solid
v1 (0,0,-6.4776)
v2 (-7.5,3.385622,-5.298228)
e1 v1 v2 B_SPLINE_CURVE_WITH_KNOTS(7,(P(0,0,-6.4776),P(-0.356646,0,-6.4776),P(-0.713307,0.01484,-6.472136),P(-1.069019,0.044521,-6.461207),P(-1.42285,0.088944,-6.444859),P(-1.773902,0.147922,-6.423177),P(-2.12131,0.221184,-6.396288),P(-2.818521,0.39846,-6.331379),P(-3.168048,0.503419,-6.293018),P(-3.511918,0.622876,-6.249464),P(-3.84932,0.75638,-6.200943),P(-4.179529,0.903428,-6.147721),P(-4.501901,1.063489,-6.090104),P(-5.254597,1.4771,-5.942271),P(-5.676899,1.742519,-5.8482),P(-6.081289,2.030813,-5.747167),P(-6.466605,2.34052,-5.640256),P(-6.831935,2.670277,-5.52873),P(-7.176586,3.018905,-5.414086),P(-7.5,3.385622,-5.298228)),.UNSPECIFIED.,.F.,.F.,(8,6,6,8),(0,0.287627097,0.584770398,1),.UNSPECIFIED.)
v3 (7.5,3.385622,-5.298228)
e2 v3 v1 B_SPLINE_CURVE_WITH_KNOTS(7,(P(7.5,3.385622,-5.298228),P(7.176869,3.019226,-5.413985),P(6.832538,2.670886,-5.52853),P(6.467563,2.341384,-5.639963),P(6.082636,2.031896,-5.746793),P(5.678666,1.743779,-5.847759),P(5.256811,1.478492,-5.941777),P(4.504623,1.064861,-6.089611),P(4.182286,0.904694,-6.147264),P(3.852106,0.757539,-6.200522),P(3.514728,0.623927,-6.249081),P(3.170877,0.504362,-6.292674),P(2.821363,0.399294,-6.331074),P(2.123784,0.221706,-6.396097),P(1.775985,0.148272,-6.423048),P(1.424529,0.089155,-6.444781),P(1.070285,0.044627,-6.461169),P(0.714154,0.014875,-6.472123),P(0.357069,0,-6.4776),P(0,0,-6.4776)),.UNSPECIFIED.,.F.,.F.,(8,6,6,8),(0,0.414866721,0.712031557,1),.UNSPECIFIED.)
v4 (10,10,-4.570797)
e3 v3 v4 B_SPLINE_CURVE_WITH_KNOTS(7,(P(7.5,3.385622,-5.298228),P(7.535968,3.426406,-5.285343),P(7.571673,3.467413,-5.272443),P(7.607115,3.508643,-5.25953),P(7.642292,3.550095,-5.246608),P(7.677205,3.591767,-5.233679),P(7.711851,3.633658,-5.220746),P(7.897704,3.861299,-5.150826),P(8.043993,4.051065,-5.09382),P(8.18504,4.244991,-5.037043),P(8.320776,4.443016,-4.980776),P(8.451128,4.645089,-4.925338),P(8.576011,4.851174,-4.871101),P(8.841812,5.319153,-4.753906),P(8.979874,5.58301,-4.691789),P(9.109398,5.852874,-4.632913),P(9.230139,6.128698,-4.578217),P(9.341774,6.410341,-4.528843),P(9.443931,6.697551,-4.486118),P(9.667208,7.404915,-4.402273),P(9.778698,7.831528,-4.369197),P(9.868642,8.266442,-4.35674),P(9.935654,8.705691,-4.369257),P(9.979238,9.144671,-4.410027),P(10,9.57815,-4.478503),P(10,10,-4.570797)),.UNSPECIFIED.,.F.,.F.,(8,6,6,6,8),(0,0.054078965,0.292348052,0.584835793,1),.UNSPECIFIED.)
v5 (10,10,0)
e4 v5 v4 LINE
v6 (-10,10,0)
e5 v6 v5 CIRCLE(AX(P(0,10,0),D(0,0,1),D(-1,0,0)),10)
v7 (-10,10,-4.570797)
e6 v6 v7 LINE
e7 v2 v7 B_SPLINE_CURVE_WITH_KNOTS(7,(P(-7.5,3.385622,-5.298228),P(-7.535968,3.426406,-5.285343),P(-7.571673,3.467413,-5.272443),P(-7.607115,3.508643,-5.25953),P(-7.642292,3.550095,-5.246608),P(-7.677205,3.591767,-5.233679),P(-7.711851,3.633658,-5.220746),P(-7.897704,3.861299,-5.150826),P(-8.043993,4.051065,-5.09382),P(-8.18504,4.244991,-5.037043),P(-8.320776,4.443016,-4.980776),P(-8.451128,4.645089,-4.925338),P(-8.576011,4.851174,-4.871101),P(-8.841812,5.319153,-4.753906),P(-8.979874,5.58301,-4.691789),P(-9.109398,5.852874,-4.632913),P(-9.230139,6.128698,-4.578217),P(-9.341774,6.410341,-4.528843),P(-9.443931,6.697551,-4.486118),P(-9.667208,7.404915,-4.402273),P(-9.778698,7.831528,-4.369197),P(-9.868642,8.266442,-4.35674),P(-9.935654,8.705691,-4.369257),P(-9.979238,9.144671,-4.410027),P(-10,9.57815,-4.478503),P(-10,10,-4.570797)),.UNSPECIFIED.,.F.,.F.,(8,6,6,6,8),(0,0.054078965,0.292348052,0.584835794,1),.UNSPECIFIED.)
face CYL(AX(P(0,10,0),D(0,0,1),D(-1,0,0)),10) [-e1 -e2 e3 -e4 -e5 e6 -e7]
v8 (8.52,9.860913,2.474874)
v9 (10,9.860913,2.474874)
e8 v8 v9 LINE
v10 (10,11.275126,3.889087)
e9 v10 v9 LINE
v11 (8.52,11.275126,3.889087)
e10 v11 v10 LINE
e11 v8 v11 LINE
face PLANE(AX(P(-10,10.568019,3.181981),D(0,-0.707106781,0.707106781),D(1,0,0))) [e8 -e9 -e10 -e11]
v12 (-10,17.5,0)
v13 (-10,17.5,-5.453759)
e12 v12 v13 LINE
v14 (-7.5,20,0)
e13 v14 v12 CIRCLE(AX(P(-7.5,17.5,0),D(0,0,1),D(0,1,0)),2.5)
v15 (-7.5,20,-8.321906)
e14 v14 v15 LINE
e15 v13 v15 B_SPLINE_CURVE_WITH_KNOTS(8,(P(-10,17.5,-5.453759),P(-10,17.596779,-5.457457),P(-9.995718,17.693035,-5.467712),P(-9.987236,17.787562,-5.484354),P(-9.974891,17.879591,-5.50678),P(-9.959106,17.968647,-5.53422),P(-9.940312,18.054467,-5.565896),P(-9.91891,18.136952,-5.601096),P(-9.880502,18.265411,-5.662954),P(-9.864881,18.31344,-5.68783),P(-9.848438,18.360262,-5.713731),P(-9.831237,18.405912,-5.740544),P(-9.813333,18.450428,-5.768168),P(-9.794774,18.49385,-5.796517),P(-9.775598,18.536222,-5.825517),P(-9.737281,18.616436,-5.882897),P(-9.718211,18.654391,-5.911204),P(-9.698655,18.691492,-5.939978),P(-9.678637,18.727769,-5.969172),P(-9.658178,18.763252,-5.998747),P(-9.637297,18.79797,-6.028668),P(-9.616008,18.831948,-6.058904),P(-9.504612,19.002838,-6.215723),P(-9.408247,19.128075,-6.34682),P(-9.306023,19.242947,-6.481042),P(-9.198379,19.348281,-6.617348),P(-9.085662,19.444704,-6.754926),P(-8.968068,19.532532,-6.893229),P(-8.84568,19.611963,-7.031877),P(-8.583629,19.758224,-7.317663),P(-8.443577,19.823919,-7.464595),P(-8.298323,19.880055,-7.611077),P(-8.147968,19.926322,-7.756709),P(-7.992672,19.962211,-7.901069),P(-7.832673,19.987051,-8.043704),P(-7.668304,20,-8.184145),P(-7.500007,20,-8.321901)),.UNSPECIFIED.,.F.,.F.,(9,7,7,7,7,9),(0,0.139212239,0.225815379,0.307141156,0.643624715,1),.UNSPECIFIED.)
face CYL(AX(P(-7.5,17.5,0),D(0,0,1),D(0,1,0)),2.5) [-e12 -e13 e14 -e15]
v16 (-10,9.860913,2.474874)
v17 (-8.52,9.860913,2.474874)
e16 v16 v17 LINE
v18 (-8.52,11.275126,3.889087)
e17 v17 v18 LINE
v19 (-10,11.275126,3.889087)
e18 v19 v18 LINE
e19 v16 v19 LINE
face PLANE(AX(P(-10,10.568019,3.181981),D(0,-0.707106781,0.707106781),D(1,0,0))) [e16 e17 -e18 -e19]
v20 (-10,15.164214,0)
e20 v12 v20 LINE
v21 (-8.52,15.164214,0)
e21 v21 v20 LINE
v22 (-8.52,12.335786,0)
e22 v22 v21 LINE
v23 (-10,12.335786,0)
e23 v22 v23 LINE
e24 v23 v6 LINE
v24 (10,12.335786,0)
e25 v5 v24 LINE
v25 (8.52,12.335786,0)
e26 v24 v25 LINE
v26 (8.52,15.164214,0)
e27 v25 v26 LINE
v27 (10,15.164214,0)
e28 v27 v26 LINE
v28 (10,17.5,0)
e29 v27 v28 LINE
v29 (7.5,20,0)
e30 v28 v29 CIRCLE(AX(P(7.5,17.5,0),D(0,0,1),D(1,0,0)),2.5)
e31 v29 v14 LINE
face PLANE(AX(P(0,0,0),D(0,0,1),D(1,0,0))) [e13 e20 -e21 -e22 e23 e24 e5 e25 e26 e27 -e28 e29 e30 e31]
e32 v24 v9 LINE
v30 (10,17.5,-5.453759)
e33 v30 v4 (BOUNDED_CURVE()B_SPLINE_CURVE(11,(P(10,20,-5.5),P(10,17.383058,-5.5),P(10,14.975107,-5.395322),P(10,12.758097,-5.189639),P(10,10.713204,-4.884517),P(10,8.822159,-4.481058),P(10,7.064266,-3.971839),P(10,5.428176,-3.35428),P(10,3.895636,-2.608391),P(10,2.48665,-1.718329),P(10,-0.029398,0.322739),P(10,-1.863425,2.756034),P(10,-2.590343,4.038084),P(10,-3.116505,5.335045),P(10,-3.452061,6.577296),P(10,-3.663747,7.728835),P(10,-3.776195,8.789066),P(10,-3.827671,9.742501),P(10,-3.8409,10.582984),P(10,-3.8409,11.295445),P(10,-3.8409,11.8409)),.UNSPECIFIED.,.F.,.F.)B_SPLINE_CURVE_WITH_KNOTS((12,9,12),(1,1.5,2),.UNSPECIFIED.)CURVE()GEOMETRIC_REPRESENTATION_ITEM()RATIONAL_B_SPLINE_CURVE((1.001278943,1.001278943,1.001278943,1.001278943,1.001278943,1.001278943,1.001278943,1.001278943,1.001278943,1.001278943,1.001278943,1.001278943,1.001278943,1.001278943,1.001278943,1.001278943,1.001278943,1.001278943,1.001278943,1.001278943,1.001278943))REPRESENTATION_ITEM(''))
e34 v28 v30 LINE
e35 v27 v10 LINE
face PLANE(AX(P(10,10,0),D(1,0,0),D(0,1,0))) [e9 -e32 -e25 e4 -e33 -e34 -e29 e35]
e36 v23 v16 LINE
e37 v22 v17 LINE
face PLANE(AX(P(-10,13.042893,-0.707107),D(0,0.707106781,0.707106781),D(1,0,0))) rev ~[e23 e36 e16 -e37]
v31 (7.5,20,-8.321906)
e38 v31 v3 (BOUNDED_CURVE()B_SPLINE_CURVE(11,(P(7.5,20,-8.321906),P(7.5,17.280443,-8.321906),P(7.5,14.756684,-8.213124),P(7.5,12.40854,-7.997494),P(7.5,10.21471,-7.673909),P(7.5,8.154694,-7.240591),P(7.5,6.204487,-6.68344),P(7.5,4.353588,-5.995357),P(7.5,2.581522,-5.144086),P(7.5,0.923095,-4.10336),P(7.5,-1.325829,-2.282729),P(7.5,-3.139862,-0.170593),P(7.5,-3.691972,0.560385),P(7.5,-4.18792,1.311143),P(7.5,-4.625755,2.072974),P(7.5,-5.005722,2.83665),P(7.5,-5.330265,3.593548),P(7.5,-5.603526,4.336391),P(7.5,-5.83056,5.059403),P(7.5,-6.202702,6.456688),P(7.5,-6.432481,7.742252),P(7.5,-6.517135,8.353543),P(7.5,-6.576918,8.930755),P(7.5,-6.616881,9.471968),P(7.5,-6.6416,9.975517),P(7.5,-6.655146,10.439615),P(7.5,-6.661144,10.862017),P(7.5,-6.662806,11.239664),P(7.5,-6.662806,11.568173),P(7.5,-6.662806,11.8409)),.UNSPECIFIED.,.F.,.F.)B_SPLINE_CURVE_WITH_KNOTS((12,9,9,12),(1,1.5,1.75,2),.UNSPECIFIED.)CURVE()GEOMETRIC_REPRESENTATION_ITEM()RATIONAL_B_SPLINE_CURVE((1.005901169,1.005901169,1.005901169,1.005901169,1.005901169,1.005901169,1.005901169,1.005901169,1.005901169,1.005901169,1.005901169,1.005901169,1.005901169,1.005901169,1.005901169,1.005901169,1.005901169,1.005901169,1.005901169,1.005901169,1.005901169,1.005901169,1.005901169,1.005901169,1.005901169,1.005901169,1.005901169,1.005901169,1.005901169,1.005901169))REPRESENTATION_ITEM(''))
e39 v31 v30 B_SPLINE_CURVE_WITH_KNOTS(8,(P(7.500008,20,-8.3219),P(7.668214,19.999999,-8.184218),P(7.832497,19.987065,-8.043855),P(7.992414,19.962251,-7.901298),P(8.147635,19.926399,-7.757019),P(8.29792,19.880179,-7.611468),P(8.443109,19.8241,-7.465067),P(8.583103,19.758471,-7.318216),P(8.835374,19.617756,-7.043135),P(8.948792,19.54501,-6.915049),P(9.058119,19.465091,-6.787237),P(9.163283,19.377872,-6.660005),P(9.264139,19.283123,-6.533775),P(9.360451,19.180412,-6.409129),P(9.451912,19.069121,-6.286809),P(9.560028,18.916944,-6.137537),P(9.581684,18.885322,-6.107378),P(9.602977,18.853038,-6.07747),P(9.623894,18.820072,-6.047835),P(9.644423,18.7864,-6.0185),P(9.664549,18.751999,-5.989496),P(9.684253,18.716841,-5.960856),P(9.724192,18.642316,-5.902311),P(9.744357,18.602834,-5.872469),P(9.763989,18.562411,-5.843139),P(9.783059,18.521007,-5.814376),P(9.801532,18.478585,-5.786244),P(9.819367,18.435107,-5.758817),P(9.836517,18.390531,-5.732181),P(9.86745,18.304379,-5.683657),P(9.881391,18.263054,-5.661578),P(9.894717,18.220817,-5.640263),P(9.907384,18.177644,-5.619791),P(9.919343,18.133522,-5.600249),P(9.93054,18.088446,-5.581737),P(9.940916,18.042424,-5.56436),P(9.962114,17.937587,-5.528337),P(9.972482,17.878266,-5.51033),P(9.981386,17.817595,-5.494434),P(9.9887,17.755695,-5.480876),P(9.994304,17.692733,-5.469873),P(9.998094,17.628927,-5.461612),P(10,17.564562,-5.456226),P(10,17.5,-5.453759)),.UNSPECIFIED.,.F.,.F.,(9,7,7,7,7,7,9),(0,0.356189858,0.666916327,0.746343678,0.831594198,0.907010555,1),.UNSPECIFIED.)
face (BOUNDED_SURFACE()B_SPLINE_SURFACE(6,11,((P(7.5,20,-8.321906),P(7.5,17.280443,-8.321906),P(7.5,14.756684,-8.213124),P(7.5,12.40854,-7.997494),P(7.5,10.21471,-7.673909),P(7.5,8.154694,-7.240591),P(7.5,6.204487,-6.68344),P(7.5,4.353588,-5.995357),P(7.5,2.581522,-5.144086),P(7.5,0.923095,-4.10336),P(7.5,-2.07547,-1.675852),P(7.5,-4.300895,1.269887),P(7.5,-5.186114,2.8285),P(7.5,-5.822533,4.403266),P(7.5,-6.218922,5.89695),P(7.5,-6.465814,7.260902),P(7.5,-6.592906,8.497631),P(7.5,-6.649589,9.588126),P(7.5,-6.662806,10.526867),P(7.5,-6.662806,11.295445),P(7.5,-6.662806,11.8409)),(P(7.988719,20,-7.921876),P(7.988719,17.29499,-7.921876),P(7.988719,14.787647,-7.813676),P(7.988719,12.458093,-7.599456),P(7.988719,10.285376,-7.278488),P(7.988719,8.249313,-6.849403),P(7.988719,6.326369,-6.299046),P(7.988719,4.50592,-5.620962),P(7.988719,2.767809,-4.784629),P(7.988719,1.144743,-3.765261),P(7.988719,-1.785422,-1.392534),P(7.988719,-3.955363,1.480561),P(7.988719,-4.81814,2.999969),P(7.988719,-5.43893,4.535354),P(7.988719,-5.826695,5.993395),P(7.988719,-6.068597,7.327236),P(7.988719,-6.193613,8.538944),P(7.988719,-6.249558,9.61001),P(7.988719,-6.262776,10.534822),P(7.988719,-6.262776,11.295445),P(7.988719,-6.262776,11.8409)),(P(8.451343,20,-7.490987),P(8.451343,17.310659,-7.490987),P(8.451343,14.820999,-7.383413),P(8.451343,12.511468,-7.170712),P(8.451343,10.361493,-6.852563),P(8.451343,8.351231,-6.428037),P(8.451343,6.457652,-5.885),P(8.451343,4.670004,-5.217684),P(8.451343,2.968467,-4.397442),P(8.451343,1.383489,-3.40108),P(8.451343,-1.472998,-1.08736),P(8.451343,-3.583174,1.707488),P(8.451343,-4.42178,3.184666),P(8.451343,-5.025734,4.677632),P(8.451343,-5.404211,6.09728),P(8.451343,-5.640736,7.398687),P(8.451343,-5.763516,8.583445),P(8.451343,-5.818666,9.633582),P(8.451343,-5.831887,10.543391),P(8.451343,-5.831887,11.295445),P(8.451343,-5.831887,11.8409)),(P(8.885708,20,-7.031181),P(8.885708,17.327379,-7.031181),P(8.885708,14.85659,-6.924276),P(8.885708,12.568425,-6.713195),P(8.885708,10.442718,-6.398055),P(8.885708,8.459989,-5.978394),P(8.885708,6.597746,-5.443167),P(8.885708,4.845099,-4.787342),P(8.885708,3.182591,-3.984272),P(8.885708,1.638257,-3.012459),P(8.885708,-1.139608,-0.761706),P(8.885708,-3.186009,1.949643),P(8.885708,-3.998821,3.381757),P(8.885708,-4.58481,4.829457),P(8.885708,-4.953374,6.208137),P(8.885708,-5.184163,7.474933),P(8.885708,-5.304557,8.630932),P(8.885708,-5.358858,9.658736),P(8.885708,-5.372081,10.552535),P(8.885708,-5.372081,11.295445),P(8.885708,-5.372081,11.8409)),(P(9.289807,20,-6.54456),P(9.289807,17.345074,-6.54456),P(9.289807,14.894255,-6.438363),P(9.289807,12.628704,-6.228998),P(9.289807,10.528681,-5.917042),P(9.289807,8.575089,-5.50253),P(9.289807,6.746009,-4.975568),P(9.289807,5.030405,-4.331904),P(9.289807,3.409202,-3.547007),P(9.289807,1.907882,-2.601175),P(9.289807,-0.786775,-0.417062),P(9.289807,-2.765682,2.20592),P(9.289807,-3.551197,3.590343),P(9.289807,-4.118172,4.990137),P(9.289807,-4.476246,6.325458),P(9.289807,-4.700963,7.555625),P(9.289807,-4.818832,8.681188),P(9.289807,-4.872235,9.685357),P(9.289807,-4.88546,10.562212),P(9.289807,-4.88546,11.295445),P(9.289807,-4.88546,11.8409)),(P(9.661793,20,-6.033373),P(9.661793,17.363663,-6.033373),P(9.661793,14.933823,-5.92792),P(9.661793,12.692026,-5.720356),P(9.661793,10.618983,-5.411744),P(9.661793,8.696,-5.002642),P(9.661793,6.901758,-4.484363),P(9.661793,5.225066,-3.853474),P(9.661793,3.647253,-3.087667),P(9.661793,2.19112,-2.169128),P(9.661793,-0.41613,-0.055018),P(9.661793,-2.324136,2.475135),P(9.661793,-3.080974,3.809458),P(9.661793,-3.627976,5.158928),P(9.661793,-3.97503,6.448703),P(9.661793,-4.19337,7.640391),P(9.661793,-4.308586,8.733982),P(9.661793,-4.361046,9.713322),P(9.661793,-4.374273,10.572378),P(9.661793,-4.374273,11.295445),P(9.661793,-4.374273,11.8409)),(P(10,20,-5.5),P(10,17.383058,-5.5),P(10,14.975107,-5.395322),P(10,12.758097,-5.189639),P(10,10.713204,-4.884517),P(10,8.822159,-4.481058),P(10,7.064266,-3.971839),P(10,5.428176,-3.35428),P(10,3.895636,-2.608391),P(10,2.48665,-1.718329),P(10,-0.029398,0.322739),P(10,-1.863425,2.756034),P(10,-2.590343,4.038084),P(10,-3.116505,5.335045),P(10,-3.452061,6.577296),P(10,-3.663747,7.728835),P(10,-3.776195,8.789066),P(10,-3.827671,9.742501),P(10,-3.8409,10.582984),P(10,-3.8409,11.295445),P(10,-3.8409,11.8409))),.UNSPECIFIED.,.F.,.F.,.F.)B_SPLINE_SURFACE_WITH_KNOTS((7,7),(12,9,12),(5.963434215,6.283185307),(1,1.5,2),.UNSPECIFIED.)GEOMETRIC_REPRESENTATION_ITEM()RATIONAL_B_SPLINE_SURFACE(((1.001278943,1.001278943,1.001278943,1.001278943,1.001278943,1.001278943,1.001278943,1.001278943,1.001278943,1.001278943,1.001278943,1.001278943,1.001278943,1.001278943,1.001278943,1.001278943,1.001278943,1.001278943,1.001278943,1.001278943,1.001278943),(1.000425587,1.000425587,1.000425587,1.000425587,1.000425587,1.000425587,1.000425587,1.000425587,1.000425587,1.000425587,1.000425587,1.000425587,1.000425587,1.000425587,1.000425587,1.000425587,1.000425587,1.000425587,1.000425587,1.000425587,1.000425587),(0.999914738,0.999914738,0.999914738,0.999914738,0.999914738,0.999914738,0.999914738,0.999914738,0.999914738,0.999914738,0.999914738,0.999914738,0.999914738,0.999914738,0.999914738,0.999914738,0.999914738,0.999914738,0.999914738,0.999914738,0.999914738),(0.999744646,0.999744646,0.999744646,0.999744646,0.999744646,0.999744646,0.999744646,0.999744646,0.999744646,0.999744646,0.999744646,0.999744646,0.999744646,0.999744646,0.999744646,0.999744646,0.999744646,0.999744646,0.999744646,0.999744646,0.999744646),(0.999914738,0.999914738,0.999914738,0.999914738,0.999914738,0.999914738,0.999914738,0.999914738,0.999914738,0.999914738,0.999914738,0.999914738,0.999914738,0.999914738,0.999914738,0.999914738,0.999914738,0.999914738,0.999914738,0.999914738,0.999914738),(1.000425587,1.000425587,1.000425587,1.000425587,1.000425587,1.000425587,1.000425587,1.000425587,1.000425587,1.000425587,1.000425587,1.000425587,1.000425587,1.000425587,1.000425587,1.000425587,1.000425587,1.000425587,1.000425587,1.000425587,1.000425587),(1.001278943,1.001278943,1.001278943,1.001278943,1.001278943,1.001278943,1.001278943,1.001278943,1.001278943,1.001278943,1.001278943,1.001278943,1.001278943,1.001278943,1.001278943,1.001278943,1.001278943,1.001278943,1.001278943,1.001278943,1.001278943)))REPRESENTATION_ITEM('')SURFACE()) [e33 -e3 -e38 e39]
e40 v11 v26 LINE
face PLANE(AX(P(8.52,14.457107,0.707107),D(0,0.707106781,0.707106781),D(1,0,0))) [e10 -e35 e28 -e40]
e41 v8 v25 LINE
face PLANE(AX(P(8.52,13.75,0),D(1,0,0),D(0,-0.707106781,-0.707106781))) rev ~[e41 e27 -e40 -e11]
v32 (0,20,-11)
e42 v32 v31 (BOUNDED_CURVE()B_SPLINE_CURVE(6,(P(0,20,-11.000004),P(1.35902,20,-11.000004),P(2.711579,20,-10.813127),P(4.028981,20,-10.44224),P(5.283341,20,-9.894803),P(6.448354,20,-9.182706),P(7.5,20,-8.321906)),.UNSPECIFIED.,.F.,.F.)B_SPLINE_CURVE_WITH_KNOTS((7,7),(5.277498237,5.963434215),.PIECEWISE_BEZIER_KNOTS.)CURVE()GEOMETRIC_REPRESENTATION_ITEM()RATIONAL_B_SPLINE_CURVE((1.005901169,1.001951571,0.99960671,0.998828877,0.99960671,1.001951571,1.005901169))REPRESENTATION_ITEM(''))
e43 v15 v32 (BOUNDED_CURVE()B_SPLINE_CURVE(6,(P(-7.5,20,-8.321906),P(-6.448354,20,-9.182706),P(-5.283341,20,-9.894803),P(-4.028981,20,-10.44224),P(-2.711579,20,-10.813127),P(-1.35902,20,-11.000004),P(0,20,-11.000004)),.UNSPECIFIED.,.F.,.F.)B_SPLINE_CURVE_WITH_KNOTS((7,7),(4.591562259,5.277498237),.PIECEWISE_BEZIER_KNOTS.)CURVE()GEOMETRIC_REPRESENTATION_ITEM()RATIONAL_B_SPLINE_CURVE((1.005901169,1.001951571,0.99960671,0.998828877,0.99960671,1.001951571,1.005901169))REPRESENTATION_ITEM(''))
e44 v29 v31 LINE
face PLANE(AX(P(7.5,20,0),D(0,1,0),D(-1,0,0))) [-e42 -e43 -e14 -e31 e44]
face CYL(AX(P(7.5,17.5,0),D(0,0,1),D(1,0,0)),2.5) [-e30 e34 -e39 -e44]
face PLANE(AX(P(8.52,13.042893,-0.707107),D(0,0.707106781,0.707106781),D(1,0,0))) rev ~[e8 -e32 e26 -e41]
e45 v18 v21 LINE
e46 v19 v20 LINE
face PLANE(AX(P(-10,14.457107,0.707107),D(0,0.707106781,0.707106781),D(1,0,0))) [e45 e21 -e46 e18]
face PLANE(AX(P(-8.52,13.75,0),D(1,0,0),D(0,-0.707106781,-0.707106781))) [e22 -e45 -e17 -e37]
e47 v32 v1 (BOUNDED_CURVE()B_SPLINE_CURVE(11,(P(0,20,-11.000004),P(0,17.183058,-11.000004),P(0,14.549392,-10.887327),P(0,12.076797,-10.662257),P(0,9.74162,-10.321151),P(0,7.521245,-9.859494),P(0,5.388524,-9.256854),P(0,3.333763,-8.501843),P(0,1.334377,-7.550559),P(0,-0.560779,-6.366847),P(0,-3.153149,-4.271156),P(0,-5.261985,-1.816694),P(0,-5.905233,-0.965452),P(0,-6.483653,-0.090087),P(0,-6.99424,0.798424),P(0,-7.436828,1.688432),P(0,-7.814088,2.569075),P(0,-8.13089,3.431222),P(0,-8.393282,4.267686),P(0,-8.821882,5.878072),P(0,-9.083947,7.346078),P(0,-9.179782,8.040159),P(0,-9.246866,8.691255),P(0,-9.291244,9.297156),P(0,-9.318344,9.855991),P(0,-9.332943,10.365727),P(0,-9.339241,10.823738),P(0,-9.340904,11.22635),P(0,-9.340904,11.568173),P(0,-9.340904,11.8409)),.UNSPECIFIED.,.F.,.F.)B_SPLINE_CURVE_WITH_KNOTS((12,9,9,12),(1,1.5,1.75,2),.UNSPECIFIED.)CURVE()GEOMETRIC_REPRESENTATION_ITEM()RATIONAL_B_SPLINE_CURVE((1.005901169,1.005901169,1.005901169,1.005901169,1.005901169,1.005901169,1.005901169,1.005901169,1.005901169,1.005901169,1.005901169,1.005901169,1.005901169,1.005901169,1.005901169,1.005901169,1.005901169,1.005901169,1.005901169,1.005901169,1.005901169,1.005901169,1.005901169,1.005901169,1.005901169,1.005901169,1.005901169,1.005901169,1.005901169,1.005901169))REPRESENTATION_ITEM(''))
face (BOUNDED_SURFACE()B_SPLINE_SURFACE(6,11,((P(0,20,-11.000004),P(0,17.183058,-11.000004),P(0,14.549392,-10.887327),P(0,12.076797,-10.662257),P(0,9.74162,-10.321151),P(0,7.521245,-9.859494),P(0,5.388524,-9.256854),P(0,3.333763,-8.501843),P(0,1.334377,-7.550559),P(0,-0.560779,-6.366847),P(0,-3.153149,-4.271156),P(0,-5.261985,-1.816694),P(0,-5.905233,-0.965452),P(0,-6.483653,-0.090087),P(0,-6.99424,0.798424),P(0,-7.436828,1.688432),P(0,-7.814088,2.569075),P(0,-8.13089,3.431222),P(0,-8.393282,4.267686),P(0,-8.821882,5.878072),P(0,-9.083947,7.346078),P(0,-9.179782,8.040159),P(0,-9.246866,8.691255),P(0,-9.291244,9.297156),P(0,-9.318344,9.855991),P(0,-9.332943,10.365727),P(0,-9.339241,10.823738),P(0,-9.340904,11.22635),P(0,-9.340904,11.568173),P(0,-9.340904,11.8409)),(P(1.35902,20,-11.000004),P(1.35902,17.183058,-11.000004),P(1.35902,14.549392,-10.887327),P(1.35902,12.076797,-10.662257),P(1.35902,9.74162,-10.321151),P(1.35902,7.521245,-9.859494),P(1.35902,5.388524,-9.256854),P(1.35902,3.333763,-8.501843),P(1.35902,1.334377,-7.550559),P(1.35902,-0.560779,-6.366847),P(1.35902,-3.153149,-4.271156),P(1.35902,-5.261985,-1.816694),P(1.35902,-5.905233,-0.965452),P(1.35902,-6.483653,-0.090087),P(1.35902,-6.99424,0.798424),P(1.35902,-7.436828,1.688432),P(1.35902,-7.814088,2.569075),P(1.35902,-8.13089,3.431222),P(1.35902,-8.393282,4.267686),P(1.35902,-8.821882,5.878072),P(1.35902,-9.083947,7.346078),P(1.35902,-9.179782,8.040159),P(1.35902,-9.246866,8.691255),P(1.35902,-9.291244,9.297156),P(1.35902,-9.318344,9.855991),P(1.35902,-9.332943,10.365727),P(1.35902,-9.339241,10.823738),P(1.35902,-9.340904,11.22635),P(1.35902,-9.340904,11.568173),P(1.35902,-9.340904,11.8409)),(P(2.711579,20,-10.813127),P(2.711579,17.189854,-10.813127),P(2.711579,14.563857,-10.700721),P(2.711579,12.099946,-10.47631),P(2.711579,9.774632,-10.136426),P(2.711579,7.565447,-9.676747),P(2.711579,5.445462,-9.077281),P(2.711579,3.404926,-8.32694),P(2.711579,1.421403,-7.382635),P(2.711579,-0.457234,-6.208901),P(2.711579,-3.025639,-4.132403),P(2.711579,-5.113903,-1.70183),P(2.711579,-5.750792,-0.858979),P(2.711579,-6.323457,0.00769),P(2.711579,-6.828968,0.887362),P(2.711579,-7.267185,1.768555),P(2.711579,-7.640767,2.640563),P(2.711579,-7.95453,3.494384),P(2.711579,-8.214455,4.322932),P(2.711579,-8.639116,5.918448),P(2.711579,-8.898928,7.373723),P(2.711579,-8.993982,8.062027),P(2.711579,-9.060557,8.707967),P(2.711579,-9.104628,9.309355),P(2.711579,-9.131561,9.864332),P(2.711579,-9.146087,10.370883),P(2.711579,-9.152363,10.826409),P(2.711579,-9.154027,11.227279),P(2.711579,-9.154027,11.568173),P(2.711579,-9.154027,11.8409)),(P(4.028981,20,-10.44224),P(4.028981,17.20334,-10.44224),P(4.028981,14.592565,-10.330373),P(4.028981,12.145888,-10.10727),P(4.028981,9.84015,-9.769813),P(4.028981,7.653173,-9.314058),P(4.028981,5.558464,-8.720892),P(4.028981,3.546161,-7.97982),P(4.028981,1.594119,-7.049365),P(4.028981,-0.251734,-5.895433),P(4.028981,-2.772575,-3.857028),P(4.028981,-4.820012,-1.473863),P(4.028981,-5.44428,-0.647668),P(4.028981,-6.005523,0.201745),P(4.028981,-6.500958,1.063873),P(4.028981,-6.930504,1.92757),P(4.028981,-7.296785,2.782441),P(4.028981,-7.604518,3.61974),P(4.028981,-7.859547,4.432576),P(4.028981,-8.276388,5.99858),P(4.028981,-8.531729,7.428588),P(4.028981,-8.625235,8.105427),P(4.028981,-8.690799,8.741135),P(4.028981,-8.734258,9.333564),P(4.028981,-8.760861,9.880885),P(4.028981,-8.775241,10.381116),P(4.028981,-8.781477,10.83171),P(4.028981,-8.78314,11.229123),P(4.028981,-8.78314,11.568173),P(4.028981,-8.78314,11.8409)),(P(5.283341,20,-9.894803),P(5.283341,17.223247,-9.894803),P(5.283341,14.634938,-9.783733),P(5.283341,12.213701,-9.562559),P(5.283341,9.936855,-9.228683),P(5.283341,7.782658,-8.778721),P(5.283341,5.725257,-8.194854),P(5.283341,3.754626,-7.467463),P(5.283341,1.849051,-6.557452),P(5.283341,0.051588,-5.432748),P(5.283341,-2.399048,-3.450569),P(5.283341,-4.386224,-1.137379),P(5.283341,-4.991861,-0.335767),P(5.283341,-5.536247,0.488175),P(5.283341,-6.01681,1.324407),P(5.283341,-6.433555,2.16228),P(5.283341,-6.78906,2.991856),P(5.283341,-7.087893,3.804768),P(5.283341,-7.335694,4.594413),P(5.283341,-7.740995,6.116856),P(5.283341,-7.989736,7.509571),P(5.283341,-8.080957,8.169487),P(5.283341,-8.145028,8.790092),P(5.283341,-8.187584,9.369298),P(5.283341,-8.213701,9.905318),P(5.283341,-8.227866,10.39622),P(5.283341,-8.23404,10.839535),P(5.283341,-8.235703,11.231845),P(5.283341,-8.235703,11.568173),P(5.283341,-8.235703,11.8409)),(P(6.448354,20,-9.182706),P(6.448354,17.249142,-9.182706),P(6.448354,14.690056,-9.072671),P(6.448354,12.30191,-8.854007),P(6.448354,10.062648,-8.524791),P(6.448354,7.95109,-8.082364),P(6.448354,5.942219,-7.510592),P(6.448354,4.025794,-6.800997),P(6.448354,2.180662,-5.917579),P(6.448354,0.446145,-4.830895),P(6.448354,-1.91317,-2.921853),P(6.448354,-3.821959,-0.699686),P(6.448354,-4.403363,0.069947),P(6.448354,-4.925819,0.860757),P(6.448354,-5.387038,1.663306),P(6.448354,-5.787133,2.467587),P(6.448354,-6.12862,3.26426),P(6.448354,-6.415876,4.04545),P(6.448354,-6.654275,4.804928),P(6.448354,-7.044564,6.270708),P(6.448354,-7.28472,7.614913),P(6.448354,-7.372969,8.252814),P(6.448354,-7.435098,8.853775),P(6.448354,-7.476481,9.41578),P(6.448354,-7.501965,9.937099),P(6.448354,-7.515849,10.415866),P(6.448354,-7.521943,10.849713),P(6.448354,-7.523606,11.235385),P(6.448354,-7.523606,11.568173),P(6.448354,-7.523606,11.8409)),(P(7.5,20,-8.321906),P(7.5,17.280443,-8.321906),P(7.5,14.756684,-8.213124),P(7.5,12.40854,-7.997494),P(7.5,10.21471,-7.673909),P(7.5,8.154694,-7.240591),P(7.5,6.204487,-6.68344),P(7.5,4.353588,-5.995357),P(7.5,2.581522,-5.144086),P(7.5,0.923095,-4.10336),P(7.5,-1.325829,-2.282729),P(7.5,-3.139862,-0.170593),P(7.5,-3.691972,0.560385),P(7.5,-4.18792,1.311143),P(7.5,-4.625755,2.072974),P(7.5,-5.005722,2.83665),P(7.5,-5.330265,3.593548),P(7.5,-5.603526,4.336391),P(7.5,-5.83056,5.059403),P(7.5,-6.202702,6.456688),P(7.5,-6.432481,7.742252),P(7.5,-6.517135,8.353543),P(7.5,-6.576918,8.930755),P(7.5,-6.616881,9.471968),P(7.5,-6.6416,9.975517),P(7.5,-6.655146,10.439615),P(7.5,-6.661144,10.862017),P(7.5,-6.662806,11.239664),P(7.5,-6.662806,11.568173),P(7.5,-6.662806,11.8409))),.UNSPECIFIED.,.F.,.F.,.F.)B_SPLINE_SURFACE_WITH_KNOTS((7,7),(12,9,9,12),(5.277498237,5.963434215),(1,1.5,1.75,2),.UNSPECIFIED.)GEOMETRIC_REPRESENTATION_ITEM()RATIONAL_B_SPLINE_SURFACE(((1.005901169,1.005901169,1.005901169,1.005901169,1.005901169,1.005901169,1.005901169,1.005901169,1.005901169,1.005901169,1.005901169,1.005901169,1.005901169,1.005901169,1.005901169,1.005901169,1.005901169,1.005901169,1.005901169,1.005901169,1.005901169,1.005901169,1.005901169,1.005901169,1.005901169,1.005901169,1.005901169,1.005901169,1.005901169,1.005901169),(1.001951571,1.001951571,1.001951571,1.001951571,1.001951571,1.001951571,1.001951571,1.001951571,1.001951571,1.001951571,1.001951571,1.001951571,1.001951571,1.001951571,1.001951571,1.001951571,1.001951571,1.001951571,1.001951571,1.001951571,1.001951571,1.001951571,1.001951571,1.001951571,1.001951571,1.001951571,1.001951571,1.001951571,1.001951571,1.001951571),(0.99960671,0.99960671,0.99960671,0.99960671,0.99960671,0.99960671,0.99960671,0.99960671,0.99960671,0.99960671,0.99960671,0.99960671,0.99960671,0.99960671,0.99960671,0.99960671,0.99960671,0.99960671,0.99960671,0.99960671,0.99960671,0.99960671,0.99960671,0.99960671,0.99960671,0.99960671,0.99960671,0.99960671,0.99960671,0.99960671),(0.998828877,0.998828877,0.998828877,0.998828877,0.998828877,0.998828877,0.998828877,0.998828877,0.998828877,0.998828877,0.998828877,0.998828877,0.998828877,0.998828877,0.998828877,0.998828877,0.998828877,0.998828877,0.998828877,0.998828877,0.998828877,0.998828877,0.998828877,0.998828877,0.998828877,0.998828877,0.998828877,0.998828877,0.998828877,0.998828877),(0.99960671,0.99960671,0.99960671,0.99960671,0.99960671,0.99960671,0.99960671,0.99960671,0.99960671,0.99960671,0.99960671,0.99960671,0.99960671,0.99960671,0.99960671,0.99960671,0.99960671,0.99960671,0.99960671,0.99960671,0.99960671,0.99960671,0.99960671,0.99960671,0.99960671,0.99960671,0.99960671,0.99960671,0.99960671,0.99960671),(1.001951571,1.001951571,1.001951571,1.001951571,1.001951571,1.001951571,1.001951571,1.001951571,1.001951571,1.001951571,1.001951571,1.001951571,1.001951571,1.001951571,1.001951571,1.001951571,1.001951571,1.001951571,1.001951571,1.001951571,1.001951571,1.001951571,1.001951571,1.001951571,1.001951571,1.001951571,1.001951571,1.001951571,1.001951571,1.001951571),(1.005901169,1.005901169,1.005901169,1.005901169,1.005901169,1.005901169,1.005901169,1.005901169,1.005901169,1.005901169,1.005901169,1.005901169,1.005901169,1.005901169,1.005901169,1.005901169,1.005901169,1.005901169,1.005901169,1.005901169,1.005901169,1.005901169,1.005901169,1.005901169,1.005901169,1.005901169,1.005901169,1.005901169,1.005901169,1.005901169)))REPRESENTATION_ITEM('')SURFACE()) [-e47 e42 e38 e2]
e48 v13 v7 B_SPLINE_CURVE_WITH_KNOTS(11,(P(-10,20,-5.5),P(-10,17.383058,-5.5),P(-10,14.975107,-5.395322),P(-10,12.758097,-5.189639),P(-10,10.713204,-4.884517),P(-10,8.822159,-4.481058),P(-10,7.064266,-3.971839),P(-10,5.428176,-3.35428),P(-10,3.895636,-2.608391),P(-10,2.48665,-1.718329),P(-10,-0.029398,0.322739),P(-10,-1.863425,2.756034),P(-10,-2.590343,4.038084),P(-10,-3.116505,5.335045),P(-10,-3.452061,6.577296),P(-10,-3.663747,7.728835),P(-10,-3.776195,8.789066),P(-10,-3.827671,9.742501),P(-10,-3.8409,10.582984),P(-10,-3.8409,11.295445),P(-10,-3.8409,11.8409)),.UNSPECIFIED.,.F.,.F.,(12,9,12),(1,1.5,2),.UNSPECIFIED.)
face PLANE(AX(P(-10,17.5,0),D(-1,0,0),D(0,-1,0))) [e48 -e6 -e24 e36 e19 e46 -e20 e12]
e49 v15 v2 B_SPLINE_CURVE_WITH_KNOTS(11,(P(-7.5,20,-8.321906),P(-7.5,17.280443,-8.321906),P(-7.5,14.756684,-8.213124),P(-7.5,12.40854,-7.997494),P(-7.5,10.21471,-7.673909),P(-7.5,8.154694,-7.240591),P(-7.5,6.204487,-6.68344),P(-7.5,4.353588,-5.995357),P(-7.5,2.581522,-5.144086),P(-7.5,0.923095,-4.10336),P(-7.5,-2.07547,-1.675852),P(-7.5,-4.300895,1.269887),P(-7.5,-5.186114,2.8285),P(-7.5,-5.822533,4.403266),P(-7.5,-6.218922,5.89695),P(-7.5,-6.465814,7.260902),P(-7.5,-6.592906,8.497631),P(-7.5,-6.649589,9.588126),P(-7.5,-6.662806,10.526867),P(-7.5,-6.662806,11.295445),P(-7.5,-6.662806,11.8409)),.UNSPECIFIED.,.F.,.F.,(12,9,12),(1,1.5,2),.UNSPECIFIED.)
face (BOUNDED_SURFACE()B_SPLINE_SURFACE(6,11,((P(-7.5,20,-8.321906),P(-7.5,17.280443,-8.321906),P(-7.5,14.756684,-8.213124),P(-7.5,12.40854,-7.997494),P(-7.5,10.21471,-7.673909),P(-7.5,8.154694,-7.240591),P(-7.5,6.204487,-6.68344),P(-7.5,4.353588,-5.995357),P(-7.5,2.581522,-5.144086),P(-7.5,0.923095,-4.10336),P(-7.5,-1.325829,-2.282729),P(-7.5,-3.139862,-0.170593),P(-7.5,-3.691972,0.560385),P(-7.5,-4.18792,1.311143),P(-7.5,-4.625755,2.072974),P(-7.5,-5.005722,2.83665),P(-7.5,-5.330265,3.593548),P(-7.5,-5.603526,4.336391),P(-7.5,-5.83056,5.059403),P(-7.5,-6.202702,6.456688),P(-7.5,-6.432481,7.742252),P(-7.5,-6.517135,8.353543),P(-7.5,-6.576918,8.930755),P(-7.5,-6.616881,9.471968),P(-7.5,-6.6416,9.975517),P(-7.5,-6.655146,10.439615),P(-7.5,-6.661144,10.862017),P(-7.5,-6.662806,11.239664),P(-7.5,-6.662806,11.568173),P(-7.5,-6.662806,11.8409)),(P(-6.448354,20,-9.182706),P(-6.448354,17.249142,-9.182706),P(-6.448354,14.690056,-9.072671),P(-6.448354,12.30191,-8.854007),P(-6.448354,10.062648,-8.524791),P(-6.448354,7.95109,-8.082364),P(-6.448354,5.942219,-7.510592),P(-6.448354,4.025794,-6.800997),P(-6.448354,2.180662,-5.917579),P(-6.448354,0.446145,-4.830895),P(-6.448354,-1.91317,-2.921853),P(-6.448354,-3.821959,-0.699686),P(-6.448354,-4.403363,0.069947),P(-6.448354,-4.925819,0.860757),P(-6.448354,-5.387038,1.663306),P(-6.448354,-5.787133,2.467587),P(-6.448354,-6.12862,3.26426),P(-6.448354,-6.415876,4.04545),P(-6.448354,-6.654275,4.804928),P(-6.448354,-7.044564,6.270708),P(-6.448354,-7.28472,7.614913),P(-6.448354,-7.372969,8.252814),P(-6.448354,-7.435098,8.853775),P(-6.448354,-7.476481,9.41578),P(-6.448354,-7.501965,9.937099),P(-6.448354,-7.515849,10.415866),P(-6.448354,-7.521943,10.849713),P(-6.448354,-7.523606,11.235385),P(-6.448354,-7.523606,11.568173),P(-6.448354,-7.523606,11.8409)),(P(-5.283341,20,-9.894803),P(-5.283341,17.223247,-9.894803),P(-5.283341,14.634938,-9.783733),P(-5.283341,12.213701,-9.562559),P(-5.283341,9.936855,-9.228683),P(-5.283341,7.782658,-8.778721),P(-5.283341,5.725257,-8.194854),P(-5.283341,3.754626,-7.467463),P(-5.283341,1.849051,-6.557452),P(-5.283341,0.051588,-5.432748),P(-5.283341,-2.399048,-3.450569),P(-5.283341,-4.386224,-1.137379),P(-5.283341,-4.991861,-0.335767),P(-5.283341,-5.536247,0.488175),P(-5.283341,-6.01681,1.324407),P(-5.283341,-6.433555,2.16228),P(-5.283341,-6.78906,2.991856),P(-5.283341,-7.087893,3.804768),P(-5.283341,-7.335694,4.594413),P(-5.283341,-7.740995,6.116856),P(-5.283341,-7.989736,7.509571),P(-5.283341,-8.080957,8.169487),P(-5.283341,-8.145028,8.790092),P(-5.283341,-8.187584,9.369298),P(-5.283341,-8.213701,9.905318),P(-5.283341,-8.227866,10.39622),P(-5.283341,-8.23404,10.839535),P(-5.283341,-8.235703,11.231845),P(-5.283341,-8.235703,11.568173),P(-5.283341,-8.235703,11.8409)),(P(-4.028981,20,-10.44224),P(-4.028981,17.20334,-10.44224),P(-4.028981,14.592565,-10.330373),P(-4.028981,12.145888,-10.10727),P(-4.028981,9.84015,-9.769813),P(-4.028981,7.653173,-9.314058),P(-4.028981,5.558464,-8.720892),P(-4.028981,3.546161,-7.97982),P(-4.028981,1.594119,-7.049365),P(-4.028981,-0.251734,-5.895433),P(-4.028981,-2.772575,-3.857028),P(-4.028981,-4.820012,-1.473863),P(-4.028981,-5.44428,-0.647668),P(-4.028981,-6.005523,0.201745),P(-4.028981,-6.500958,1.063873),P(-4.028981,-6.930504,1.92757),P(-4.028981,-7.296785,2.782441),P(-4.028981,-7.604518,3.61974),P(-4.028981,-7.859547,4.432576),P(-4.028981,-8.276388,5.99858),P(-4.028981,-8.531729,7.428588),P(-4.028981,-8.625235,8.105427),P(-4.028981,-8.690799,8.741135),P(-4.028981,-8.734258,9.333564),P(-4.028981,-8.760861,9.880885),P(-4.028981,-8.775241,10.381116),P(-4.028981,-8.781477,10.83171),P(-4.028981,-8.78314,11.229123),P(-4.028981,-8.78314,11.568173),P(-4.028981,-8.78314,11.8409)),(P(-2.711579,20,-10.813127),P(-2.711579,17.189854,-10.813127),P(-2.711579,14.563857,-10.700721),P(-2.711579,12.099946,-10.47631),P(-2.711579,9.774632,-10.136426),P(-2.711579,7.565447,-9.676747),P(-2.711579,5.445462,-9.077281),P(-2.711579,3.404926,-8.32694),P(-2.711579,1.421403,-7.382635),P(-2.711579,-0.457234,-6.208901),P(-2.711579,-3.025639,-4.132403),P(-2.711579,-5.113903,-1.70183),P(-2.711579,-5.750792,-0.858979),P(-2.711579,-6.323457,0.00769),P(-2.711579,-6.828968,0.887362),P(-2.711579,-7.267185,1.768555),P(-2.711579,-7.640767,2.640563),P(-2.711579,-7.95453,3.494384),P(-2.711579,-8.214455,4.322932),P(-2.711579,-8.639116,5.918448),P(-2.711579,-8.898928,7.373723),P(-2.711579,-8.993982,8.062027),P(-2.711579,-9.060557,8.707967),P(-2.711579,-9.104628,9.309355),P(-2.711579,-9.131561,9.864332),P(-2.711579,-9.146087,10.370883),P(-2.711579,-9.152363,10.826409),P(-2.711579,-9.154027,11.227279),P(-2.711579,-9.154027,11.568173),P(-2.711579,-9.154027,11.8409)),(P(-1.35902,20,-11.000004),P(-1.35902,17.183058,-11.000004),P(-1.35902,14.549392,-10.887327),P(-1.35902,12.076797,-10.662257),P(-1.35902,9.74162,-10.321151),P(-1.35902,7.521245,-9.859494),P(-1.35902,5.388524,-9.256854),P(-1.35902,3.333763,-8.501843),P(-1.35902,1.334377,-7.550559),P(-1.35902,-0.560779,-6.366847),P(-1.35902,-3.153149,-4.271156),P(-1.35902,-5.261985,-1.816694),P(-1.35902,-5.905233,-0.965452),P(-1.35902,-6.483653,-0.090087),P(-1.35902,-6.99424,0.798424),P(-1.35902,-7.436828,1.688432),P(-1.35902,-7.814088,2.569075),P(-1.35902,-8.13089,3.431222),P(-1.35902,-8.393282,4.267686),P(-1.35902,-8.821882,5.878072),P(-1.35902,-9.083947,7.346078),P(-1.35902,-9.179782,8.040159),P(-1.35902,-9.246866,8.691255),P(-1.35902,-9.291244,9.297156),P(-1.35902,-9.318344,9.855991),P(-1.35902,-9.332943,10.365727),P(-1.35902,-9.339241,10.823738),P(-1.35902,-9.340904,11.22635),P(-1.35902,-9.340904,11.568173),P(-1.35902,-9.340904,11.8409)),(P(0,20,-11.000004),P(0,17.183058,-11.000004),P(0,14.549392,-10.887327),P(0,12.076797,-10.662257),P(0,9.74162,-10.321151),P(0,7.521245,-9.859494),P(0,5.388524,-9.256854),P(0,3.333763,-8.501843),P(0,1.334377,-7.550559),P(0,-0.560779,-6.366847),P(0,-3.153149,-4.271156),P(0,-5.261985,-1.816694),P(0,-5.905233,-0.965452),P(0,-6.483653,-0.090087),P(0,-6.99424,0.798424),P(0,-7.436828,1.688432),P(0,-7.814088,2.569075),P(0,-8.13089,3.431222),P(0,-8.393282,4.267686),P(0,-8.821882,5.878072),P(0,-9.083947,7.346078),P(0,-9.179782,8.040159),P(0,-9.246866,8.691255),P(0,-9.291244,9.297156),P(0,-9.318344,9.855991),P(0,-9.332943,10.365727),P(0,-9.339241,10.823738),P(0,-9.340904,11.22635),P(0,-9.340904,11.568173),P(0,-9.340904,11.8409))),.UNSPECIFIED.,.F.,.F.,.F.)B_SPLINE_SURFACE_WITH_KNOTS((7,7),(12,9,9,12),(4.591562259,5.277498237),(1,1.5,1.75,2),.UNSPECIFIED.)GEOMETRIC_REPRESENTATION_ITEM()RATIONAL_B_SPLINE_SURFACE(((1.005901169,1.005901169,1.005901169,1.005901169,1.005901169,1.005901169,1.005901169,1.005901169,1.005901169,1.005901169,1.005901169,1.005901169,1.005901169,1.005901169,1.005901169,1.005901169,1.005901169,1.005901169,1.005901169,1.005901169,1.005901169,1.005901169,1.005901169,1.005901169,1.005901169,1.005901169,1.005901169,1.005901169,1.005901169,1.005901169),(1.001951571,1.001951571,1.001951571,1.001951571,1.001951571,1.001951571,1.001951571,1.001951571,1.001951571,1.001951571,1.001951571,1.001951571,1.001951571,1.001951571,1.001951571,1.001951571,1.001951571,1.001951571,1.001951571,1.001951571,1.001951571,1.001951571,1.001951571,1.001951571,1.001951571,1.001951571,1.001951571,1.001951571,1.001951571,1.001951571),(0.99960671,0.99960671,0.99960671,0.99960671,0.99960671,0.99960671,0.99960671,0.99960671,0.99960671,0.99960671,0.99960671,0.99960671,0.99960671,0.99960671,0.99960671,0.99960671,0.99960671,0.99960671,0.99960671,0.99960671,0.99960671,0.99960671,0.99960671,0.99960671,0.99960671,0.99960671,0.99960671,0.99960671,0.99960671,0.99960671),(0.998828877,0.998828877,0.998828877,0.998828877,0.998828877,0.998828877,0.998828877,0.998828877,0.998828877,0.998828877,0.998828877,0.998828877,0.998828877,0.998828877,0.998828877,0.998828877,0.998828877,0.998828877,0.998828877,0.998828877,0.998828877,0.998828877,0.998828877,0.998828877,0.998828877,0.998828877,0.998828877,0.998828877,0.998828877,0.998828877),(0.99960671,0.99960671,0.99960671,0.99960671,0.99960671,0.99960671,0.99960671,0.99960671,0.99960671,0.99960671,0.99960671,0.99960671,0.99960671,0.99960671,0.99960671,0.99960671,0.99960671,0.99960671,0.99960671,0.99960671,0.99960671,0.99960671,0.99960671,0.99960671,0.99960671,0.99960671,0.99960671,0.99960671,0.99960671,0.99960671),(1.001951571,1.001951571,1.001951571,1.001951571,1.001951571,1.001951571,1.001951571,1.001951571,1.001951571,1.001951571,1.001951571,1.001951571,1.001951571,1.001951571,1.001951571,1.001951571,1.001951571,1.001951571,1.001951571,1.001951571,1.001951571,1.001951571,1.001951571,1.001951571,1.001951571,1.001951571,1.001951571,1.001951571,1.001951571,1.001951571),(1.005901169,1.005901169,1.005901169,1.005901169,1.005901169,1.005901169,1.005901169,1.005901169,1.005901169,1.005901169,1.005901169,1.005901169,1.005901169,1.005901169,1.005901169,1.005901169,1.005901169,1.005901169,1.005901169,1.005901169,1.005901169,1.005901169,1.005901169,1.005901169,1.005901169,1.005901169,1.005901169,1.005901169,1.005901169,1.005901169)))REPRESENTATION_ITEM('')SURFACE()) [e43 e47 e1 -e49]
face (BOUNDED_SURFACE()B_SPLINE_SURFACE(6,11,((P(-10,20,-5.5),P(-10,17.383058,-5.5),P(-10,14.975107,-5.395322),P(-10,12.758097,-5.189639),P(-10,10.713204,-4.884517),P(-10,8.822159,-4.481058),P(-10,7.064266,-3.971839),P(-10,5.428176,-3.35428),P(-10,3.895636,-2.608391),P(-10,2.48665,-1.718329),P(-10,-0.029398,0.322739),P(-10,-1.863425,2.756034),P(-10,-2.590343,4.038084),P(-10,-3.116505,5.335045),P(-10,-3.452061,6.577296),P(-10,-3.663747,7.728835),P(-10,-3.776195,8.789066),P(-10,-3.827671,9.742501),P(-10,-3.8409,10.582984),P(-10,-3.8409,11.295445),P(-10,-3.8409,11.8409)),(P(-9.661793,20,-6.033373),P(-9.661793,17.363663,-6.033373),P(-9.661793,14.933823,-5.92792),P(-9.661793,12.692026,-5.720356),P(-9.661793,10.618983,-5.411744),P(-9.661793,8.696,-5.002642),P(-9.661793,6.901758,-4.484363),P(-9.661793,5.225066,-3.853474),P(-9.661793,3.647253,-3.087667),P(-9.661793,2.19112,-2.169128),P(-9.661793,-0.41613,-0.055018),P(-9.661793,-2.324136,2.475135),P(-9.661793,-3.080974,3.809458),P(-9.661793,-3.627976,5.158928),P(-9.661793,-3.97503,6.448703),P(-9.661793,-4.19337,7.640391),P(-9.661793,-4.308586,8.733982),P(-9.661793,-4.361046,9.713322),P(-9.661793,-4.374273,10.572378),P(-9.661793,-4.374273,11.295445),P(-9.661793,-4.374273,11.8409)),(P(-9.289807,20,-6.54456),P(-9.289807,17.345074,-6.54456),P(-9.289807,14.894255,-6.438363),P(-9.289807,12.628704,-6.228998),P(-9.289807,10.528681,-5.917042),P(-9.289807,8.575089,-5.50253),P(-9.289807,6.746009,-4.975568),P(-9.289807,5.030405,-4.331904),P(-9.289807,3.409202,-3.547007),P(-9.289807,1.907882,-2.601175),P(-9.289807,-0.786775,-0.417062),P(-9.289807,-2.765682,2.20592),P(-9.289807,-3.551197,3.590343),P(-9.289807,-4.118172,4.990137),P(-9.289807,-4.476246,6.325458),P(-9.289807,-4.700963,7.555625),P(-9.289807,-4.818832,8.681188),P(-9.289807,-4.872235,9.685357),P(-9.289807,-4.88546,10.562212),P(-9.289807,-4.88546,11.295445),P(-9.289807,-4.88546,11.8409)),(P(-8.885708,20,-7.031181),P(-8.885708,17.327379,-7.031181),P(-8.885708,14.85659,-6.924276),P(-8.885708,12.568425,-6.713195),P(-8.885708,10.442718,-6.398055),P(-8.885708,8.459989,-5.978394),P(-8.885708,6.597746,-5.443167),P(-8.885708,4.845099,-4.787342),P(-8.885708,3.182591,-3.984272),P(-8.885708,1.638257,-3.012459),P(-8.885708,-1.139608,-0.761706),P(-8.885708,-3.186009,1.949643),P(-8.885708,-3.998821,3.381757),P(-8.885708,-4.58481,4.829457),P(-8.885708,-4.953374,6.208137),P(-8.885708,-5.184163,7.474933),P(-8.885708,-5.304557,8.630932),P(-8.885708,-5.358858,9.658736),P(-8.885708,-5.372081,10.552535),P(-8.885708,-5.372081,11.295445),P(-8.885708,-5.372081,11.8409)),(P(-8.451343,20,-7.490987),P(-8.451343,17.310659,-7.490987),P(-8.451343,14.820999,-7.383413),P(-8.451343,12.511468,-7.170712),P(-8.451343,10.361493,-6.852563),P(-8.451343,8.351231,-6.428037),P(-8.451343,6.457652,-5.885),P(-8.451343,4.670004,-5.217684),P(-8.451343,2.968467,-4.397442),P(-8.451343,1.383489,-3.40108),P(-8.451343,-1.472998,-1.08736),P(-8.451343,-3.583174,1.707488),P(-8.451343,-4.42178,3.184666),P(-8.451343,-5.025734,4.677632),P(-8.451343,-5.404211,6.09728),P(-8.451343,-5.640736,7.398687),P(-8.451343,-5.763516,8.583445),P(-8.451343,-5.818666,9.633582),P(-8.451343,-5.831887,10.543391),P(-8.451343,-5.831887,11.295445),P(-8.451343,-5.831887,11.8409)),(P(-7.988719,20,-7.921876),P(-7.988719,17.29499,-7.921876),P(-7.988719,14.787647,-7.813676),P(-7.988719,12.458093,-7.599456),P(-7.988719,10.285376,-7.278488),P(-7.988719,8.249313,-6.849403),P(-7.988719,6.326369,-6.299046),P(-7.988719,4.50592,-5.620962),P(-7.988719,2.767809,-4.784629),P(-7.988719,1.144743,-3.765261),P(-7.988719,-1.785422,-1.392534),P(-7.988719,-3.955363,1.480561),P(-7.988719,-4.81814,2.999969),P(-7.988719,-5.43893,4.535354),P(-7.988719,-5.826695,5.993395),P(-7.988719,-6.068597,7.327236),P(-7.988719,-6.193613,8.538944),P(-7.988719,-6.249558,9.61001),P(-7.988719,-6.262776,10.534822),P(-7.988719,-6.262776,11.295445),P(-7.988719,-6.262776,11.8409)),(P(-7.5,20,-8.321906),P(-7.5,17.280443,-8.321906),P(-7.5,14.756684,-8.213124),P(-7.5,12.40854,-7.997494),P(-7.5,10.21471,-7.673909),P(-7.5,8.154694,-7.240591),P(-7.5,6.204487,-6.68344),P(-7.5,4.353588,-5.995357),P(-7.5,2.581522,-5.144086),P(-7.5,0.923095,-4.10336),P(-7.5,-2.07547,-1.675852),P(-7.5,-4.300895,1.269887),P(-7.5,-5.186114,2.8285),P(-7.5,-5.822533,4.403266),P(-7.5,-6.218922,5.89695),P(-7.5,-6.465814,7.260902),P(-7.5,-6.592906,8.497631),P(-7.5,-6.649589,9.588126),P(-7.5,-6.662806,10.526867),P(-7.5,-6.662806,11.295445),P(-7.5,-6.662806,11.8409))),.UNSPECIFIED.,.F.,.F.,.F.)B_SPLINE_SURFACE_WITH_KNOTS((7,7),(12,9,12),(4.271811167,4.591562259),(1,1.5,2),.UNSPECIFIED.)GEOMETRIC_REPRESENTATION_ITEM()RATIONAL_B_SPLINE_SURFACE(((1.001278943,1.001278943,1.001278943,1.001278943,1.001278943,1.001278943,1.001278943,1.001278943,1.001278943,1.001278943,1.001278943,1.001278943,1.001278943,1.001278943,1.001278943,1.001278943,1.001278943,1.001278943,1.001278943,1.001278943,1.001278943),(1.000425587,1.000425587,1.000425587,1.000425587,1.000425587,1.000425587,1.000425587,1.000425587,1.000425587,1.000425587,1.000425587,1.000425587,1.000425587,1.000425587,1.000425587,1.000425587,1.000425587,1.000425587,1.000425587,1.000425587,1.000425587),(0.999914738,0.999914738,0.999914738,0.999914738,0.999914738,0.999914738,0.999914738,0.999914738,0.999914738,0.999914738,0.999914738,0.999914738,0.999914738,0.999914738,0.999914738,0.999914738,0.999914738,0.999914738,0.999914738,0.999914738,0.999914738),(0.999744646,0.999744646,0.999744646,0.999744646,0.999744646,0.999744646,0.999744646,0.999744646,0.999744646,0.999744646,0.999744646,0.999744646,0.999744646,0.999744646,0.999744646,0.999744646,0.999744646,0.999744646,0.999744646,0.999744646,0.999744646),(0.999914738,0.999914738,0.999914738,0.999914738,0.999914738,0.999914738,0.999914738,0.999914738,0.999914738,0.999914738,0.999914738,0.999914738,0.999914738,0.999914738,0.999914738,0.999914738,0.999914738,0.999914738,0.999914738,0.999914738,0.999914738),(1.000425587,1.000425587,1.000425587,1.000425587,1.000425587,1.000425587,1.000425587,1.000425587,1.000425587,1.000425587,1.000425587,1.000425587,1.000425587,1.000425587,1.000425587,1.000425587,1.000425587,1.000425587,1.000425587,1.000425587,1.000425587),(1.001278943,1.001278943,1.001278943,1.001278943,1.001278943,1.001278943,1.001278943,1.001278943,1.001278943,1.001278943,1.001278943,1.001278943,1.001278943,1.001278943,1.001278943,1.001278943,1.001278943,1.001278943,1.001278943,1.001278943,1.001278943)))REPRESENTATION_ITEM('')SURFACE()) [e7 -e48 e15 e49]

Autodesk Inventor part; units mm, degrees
ref_plane "YZ Plane" through (0, 0, 0) normal (1, 0, 0) x (0, 1, 0)
sketch "Imprint Transfer" plane through (0, 0, 0) normal (0, 0, 1) x (1, 0, 0)
  arc A0 (-10, 10) -> (10, 10) centre (0, 10) ccw
  line L0 (10, 10) -> (10, 17.5)
  arc A1 (10, 17.5) -> (7.5, 20) centre (7.5, 17.5) ccw
  line L1 (7.5, 20) -> (-7.5, 20)
  arc A2 (-7.5, 20) -> (-10, 17.5) centre (-7.5, 17.5) ccw
  line L2 (-10, 17.5) -> (-10, 10)
  point P0 (0, 0)
  point P1 (0, 7.0711)
sketch "Sketch2" plane through (0, 0, 0) normal (0, 0, 1) x (1, 0, 0)
  line L0 (-10, 17.5) -> (-10, 10) projected
  arc A0 (-10, 10) -> (10, 10) centre (0, 10) ccw projected
  line L1 (10, 10) -> (10, 17.5) projected
  arc A1 (10, 17.5) -> (7.5, 20) centre (7.5, 17.5) ccw projected
  line L2 (7.5, 20) -> (-7.5, 20) projected
  arc A2 (-7.5, 20) -> (-10, 17.5) centre (-7.5, 17.5) ccw projected
  point P0 (0, 0)
extrude "Extrusion1" add sketch "Sketch2" against normal blind 11
sketch "Rotational Axis" plane through (0, 0, 0) normal (0, 0, 1) x (1, 0, 0)
  arc A0 (-10, 10) -> (10, 10) centre (0, 10) ccw projected
  line L0 (10, 10) -> (10, 17.5) projected
  arc A1 (10, 17.5) -> (7.5, 20) centre (7.5, 17.5) ccw projected
  line L1 (7.5, 20) -> (-7.5, 20) projected
  arc A2 (-7.5, 20) -> (-10, 17.5) centre (-7.5, 17.5) ccw projected
  line L2 (-10, 17.5) -> (-10, 10) projected
  line L3 (-10, 10) -> (-10, 17.5) projected
  line L4 (-10, 13.75) -> (10, 13.75)
  line L5 (10, 17.5) -> (10, 10) projected
  point P0 (0, 0)
ref_plane "Dovetail Plane" through (-10, 13.75, 0) normal (0, -0.7071068, 0.7071068) x (1, 0, 0)
sketch "Sketch4" plane through (-10, 13.75, 0) normal (0, -0.7071068, 0.7071068) x (1, 0, 0)
  ellipse E0 centre (10, -2.6517) end of major axis (0, -2.6517) minor radius 7.0711 (0, -2.6517) -> (20, -2.6517) ccw projected
  line L0 (20, -2.6517) -> (20, 2.6517) projected
  ellipse E1 centre (17.5, 2.6517) end of major axis (20, 2.6517) minor radius 1.7678 (20, 2.6517) -> (17.5, 4.4194) ccw projected
  line L1 (17.5, 4.4194) -> (2.5, 4.4194) projected
  ellipse E2 centre (2.5, 2.6517) end of major axis (0, 2.6517) minor radius 1.7678 (2.5, 4.4194) -> (0, 2.6517) ccw projected
  line L2 (0, 2.6517) -> (0, -2.6517) projected
  line L3 (0, 0) -> (20, 0)
  line L4 (0, 1) -> (20, 1)
  line L5 (0, -1) -> (20, -1)
  line L6 (0, 1) -> (1.48, 1)
  line L7 (1.48, 1) -> (1.48, -1)
  line L8 (1.48, -1) -> (0, -1)
  line L9 (0, -1) -> (0, 1)
  line L10 (20, 1) -> (18.52, 1)
  line L11 (18.52, 1) -> (18.52, -1)
  line L12 (18.52, -1) -> (20, -1)
  line L13 (20, -1) -> (20, 1)
  point P0 (10, -9.7227)
  point P1 (1.48, 1)
  point P2 (0, 1)
  point P3 (0, -1)
  point P4 (1.48, -1)
  point P5 (18.52, 1)
  point P6 (18.52, -1)
  point P7 (20, -1)
  point P8 (20, 1)
  dimension "d3" = 1
  dimension "d4" = 1
  dimension "d5" = 1.48
  dimension "d6" = 2
  dimension "d7" = 1.48
  dimension "d8" = 2
  dimension "d13" = 0
  dimension "d14" = 0
extrude "Extrusion2" add sketch "Sketch4" along normal blind 4.5 and the other way blind 2 contours L2 L3 L7 L5 | L5 L11 L3 L0 | L2 L4 L7 L3 | L3 L11 L4 L0
sketch "Sketch6" plane through (-7.5, 20, 0) normal (0, 1, 0) x (1, 0, 0)
  line L0 (15, 0) -> (0, 0) projected
  line L1 (15, 0) -> (15, 11) projected
  line L2 (0, 11) -> (15, 11) projected
  line L3 (0, 0) -> (0, 11) projected
  line L4 (17.5, 0) -> (15, 0) projected
  line L5 (17.5, 0) -> (17.5, 11) projected
  line L6 (15, 11) -> (17.5, 11) projected
  line L7 (15, 0) -> (15, 11) projected
  line L8 (0, 0) -> (-2.5, 0) projected
  line L9 (0, 0) -> (0, 11) projected
  line L10 (-2.5, 11) -> (0, 11) projected
  line L11 (-2.5, 0) -> (-2.5, 11) projected
  line L12 (17.5, 0) -> (17.5, 11) projected
  line L13 (-2.5, 0) -> (-2.5, 11) projected
  arc A0 (17.5, 5.5) -> (-2.5, 5.5) centre (7.5, -0.8409) ccw
  line L14 (17.5, 11) -> (-2.5, 11)
  line L15 (-2.5, 11) -> (-2.5, 16)
  line L16 (-2.5, 16) -> (17.5, 16)
  line L17 (17.5, 16) -> (17.5, 11)
  point P0 (7.5, 0)
  point P1 (7.5, 11)
  point P2 (-2.5, 5.5)
  dimension "d27" = 20
  dimension "d28" = 5
ref_plane "MidPlane" through (0, 10, -11) normal (1, 0, 0) x (0, 0, -1)
sketch "GuideReference" plane through (0, 10, -11) normal (1, 0, 0) x (0, 0, -1)
  line L0 (-11, 0) -> (-11, 0) projected
  line L1 (-11, 0) -> (0, 0) projected
  line L2 (0, 0) -> (0, 0) projected
  line L3 (-11, 0) -> (0, 0) projected
  line L4 (-11, 10) -> (-11, 7.5) projected
  line L5 (-11, 10) -> (0, 10) projected
  line L6 (0, 7.5) -> (0, 10) projected
  line L7 (-11, 7.5) -> (0, 7.5) projected
  line L8 (-11, 7.5) -> (-11, 5.1642) projected
  line L9 (-11, 7.5) -> (0, 7.5) projected
  line L10 (0, 0) -> (0, 7.5) projected
  line L11 (-11, 0) -> (0, 0) projected
  line L12 (-11, 2.3358) -> (-11, 0) projected
  line L13 (-11, 2.3358) -> (-13.4749, -0.1391) projected
  line L14 (-14.8891, 1.2751) -> (-13.4749, -0.1391) projected
  line L15 (-11, 5.1642) -> (-14.8891, 1.2751) projected
  line L16 (-11.8409, -10) -> (-0.8409, -10) construction
  line L17 (-11.8409, 10) -> (-11.8409, -7.5)
  line L18 (-11.8409, 10) -> (5.6591, 10) construction
  line L19 (-11.8409, -7.5) -> (-18.8409, -7.5)
  line L20 (-18.8409, -7.5) -> (-22.8409, -7.5)
  line L21 (-11.8409, 10) -> (-11.8409, -7.5) construction
  line L22 (-11.8409, -7.5) -> (-18.8409, -7.5) construction
  line L23 (-18.8409, -7.5) -> (-22.8409, -7.5) construction
  spline S0 degree 3 poles (-11.8409, 10) (-11.8409, -7.5) (-18.8409, -7.5) (-22.8409, -7.5) knots 1 1 1 1 2 2 2 2
  point P0 (-11, -10)
  dimension "d24" = 17.5
  dimension "d25" = 90
  dimension "d26" = 7
sketch "Sketch10" plane through (0, 10, -11) normal (1, 0, 0) x (0, 0, -1)
  spline S0 degree 3 poles (-11.8409, 10) (-11.8409, -7.5) (-18.8409, -7.5) (-22.8409, -7.5) knots 1 1 1 1 2 2 2 2 projected
  point P0 (-11, -10)
sweep "Sweep2" cut profiles "Sketch6" path "Sketch10" contours A0 L2 L1 | L1 L6 L5 A0 | A0 L11 L10 L3 | L3 L2 A0 | L2 L10 L15 L16 L17 L6
properties part number "FingerTip Hardtip"
